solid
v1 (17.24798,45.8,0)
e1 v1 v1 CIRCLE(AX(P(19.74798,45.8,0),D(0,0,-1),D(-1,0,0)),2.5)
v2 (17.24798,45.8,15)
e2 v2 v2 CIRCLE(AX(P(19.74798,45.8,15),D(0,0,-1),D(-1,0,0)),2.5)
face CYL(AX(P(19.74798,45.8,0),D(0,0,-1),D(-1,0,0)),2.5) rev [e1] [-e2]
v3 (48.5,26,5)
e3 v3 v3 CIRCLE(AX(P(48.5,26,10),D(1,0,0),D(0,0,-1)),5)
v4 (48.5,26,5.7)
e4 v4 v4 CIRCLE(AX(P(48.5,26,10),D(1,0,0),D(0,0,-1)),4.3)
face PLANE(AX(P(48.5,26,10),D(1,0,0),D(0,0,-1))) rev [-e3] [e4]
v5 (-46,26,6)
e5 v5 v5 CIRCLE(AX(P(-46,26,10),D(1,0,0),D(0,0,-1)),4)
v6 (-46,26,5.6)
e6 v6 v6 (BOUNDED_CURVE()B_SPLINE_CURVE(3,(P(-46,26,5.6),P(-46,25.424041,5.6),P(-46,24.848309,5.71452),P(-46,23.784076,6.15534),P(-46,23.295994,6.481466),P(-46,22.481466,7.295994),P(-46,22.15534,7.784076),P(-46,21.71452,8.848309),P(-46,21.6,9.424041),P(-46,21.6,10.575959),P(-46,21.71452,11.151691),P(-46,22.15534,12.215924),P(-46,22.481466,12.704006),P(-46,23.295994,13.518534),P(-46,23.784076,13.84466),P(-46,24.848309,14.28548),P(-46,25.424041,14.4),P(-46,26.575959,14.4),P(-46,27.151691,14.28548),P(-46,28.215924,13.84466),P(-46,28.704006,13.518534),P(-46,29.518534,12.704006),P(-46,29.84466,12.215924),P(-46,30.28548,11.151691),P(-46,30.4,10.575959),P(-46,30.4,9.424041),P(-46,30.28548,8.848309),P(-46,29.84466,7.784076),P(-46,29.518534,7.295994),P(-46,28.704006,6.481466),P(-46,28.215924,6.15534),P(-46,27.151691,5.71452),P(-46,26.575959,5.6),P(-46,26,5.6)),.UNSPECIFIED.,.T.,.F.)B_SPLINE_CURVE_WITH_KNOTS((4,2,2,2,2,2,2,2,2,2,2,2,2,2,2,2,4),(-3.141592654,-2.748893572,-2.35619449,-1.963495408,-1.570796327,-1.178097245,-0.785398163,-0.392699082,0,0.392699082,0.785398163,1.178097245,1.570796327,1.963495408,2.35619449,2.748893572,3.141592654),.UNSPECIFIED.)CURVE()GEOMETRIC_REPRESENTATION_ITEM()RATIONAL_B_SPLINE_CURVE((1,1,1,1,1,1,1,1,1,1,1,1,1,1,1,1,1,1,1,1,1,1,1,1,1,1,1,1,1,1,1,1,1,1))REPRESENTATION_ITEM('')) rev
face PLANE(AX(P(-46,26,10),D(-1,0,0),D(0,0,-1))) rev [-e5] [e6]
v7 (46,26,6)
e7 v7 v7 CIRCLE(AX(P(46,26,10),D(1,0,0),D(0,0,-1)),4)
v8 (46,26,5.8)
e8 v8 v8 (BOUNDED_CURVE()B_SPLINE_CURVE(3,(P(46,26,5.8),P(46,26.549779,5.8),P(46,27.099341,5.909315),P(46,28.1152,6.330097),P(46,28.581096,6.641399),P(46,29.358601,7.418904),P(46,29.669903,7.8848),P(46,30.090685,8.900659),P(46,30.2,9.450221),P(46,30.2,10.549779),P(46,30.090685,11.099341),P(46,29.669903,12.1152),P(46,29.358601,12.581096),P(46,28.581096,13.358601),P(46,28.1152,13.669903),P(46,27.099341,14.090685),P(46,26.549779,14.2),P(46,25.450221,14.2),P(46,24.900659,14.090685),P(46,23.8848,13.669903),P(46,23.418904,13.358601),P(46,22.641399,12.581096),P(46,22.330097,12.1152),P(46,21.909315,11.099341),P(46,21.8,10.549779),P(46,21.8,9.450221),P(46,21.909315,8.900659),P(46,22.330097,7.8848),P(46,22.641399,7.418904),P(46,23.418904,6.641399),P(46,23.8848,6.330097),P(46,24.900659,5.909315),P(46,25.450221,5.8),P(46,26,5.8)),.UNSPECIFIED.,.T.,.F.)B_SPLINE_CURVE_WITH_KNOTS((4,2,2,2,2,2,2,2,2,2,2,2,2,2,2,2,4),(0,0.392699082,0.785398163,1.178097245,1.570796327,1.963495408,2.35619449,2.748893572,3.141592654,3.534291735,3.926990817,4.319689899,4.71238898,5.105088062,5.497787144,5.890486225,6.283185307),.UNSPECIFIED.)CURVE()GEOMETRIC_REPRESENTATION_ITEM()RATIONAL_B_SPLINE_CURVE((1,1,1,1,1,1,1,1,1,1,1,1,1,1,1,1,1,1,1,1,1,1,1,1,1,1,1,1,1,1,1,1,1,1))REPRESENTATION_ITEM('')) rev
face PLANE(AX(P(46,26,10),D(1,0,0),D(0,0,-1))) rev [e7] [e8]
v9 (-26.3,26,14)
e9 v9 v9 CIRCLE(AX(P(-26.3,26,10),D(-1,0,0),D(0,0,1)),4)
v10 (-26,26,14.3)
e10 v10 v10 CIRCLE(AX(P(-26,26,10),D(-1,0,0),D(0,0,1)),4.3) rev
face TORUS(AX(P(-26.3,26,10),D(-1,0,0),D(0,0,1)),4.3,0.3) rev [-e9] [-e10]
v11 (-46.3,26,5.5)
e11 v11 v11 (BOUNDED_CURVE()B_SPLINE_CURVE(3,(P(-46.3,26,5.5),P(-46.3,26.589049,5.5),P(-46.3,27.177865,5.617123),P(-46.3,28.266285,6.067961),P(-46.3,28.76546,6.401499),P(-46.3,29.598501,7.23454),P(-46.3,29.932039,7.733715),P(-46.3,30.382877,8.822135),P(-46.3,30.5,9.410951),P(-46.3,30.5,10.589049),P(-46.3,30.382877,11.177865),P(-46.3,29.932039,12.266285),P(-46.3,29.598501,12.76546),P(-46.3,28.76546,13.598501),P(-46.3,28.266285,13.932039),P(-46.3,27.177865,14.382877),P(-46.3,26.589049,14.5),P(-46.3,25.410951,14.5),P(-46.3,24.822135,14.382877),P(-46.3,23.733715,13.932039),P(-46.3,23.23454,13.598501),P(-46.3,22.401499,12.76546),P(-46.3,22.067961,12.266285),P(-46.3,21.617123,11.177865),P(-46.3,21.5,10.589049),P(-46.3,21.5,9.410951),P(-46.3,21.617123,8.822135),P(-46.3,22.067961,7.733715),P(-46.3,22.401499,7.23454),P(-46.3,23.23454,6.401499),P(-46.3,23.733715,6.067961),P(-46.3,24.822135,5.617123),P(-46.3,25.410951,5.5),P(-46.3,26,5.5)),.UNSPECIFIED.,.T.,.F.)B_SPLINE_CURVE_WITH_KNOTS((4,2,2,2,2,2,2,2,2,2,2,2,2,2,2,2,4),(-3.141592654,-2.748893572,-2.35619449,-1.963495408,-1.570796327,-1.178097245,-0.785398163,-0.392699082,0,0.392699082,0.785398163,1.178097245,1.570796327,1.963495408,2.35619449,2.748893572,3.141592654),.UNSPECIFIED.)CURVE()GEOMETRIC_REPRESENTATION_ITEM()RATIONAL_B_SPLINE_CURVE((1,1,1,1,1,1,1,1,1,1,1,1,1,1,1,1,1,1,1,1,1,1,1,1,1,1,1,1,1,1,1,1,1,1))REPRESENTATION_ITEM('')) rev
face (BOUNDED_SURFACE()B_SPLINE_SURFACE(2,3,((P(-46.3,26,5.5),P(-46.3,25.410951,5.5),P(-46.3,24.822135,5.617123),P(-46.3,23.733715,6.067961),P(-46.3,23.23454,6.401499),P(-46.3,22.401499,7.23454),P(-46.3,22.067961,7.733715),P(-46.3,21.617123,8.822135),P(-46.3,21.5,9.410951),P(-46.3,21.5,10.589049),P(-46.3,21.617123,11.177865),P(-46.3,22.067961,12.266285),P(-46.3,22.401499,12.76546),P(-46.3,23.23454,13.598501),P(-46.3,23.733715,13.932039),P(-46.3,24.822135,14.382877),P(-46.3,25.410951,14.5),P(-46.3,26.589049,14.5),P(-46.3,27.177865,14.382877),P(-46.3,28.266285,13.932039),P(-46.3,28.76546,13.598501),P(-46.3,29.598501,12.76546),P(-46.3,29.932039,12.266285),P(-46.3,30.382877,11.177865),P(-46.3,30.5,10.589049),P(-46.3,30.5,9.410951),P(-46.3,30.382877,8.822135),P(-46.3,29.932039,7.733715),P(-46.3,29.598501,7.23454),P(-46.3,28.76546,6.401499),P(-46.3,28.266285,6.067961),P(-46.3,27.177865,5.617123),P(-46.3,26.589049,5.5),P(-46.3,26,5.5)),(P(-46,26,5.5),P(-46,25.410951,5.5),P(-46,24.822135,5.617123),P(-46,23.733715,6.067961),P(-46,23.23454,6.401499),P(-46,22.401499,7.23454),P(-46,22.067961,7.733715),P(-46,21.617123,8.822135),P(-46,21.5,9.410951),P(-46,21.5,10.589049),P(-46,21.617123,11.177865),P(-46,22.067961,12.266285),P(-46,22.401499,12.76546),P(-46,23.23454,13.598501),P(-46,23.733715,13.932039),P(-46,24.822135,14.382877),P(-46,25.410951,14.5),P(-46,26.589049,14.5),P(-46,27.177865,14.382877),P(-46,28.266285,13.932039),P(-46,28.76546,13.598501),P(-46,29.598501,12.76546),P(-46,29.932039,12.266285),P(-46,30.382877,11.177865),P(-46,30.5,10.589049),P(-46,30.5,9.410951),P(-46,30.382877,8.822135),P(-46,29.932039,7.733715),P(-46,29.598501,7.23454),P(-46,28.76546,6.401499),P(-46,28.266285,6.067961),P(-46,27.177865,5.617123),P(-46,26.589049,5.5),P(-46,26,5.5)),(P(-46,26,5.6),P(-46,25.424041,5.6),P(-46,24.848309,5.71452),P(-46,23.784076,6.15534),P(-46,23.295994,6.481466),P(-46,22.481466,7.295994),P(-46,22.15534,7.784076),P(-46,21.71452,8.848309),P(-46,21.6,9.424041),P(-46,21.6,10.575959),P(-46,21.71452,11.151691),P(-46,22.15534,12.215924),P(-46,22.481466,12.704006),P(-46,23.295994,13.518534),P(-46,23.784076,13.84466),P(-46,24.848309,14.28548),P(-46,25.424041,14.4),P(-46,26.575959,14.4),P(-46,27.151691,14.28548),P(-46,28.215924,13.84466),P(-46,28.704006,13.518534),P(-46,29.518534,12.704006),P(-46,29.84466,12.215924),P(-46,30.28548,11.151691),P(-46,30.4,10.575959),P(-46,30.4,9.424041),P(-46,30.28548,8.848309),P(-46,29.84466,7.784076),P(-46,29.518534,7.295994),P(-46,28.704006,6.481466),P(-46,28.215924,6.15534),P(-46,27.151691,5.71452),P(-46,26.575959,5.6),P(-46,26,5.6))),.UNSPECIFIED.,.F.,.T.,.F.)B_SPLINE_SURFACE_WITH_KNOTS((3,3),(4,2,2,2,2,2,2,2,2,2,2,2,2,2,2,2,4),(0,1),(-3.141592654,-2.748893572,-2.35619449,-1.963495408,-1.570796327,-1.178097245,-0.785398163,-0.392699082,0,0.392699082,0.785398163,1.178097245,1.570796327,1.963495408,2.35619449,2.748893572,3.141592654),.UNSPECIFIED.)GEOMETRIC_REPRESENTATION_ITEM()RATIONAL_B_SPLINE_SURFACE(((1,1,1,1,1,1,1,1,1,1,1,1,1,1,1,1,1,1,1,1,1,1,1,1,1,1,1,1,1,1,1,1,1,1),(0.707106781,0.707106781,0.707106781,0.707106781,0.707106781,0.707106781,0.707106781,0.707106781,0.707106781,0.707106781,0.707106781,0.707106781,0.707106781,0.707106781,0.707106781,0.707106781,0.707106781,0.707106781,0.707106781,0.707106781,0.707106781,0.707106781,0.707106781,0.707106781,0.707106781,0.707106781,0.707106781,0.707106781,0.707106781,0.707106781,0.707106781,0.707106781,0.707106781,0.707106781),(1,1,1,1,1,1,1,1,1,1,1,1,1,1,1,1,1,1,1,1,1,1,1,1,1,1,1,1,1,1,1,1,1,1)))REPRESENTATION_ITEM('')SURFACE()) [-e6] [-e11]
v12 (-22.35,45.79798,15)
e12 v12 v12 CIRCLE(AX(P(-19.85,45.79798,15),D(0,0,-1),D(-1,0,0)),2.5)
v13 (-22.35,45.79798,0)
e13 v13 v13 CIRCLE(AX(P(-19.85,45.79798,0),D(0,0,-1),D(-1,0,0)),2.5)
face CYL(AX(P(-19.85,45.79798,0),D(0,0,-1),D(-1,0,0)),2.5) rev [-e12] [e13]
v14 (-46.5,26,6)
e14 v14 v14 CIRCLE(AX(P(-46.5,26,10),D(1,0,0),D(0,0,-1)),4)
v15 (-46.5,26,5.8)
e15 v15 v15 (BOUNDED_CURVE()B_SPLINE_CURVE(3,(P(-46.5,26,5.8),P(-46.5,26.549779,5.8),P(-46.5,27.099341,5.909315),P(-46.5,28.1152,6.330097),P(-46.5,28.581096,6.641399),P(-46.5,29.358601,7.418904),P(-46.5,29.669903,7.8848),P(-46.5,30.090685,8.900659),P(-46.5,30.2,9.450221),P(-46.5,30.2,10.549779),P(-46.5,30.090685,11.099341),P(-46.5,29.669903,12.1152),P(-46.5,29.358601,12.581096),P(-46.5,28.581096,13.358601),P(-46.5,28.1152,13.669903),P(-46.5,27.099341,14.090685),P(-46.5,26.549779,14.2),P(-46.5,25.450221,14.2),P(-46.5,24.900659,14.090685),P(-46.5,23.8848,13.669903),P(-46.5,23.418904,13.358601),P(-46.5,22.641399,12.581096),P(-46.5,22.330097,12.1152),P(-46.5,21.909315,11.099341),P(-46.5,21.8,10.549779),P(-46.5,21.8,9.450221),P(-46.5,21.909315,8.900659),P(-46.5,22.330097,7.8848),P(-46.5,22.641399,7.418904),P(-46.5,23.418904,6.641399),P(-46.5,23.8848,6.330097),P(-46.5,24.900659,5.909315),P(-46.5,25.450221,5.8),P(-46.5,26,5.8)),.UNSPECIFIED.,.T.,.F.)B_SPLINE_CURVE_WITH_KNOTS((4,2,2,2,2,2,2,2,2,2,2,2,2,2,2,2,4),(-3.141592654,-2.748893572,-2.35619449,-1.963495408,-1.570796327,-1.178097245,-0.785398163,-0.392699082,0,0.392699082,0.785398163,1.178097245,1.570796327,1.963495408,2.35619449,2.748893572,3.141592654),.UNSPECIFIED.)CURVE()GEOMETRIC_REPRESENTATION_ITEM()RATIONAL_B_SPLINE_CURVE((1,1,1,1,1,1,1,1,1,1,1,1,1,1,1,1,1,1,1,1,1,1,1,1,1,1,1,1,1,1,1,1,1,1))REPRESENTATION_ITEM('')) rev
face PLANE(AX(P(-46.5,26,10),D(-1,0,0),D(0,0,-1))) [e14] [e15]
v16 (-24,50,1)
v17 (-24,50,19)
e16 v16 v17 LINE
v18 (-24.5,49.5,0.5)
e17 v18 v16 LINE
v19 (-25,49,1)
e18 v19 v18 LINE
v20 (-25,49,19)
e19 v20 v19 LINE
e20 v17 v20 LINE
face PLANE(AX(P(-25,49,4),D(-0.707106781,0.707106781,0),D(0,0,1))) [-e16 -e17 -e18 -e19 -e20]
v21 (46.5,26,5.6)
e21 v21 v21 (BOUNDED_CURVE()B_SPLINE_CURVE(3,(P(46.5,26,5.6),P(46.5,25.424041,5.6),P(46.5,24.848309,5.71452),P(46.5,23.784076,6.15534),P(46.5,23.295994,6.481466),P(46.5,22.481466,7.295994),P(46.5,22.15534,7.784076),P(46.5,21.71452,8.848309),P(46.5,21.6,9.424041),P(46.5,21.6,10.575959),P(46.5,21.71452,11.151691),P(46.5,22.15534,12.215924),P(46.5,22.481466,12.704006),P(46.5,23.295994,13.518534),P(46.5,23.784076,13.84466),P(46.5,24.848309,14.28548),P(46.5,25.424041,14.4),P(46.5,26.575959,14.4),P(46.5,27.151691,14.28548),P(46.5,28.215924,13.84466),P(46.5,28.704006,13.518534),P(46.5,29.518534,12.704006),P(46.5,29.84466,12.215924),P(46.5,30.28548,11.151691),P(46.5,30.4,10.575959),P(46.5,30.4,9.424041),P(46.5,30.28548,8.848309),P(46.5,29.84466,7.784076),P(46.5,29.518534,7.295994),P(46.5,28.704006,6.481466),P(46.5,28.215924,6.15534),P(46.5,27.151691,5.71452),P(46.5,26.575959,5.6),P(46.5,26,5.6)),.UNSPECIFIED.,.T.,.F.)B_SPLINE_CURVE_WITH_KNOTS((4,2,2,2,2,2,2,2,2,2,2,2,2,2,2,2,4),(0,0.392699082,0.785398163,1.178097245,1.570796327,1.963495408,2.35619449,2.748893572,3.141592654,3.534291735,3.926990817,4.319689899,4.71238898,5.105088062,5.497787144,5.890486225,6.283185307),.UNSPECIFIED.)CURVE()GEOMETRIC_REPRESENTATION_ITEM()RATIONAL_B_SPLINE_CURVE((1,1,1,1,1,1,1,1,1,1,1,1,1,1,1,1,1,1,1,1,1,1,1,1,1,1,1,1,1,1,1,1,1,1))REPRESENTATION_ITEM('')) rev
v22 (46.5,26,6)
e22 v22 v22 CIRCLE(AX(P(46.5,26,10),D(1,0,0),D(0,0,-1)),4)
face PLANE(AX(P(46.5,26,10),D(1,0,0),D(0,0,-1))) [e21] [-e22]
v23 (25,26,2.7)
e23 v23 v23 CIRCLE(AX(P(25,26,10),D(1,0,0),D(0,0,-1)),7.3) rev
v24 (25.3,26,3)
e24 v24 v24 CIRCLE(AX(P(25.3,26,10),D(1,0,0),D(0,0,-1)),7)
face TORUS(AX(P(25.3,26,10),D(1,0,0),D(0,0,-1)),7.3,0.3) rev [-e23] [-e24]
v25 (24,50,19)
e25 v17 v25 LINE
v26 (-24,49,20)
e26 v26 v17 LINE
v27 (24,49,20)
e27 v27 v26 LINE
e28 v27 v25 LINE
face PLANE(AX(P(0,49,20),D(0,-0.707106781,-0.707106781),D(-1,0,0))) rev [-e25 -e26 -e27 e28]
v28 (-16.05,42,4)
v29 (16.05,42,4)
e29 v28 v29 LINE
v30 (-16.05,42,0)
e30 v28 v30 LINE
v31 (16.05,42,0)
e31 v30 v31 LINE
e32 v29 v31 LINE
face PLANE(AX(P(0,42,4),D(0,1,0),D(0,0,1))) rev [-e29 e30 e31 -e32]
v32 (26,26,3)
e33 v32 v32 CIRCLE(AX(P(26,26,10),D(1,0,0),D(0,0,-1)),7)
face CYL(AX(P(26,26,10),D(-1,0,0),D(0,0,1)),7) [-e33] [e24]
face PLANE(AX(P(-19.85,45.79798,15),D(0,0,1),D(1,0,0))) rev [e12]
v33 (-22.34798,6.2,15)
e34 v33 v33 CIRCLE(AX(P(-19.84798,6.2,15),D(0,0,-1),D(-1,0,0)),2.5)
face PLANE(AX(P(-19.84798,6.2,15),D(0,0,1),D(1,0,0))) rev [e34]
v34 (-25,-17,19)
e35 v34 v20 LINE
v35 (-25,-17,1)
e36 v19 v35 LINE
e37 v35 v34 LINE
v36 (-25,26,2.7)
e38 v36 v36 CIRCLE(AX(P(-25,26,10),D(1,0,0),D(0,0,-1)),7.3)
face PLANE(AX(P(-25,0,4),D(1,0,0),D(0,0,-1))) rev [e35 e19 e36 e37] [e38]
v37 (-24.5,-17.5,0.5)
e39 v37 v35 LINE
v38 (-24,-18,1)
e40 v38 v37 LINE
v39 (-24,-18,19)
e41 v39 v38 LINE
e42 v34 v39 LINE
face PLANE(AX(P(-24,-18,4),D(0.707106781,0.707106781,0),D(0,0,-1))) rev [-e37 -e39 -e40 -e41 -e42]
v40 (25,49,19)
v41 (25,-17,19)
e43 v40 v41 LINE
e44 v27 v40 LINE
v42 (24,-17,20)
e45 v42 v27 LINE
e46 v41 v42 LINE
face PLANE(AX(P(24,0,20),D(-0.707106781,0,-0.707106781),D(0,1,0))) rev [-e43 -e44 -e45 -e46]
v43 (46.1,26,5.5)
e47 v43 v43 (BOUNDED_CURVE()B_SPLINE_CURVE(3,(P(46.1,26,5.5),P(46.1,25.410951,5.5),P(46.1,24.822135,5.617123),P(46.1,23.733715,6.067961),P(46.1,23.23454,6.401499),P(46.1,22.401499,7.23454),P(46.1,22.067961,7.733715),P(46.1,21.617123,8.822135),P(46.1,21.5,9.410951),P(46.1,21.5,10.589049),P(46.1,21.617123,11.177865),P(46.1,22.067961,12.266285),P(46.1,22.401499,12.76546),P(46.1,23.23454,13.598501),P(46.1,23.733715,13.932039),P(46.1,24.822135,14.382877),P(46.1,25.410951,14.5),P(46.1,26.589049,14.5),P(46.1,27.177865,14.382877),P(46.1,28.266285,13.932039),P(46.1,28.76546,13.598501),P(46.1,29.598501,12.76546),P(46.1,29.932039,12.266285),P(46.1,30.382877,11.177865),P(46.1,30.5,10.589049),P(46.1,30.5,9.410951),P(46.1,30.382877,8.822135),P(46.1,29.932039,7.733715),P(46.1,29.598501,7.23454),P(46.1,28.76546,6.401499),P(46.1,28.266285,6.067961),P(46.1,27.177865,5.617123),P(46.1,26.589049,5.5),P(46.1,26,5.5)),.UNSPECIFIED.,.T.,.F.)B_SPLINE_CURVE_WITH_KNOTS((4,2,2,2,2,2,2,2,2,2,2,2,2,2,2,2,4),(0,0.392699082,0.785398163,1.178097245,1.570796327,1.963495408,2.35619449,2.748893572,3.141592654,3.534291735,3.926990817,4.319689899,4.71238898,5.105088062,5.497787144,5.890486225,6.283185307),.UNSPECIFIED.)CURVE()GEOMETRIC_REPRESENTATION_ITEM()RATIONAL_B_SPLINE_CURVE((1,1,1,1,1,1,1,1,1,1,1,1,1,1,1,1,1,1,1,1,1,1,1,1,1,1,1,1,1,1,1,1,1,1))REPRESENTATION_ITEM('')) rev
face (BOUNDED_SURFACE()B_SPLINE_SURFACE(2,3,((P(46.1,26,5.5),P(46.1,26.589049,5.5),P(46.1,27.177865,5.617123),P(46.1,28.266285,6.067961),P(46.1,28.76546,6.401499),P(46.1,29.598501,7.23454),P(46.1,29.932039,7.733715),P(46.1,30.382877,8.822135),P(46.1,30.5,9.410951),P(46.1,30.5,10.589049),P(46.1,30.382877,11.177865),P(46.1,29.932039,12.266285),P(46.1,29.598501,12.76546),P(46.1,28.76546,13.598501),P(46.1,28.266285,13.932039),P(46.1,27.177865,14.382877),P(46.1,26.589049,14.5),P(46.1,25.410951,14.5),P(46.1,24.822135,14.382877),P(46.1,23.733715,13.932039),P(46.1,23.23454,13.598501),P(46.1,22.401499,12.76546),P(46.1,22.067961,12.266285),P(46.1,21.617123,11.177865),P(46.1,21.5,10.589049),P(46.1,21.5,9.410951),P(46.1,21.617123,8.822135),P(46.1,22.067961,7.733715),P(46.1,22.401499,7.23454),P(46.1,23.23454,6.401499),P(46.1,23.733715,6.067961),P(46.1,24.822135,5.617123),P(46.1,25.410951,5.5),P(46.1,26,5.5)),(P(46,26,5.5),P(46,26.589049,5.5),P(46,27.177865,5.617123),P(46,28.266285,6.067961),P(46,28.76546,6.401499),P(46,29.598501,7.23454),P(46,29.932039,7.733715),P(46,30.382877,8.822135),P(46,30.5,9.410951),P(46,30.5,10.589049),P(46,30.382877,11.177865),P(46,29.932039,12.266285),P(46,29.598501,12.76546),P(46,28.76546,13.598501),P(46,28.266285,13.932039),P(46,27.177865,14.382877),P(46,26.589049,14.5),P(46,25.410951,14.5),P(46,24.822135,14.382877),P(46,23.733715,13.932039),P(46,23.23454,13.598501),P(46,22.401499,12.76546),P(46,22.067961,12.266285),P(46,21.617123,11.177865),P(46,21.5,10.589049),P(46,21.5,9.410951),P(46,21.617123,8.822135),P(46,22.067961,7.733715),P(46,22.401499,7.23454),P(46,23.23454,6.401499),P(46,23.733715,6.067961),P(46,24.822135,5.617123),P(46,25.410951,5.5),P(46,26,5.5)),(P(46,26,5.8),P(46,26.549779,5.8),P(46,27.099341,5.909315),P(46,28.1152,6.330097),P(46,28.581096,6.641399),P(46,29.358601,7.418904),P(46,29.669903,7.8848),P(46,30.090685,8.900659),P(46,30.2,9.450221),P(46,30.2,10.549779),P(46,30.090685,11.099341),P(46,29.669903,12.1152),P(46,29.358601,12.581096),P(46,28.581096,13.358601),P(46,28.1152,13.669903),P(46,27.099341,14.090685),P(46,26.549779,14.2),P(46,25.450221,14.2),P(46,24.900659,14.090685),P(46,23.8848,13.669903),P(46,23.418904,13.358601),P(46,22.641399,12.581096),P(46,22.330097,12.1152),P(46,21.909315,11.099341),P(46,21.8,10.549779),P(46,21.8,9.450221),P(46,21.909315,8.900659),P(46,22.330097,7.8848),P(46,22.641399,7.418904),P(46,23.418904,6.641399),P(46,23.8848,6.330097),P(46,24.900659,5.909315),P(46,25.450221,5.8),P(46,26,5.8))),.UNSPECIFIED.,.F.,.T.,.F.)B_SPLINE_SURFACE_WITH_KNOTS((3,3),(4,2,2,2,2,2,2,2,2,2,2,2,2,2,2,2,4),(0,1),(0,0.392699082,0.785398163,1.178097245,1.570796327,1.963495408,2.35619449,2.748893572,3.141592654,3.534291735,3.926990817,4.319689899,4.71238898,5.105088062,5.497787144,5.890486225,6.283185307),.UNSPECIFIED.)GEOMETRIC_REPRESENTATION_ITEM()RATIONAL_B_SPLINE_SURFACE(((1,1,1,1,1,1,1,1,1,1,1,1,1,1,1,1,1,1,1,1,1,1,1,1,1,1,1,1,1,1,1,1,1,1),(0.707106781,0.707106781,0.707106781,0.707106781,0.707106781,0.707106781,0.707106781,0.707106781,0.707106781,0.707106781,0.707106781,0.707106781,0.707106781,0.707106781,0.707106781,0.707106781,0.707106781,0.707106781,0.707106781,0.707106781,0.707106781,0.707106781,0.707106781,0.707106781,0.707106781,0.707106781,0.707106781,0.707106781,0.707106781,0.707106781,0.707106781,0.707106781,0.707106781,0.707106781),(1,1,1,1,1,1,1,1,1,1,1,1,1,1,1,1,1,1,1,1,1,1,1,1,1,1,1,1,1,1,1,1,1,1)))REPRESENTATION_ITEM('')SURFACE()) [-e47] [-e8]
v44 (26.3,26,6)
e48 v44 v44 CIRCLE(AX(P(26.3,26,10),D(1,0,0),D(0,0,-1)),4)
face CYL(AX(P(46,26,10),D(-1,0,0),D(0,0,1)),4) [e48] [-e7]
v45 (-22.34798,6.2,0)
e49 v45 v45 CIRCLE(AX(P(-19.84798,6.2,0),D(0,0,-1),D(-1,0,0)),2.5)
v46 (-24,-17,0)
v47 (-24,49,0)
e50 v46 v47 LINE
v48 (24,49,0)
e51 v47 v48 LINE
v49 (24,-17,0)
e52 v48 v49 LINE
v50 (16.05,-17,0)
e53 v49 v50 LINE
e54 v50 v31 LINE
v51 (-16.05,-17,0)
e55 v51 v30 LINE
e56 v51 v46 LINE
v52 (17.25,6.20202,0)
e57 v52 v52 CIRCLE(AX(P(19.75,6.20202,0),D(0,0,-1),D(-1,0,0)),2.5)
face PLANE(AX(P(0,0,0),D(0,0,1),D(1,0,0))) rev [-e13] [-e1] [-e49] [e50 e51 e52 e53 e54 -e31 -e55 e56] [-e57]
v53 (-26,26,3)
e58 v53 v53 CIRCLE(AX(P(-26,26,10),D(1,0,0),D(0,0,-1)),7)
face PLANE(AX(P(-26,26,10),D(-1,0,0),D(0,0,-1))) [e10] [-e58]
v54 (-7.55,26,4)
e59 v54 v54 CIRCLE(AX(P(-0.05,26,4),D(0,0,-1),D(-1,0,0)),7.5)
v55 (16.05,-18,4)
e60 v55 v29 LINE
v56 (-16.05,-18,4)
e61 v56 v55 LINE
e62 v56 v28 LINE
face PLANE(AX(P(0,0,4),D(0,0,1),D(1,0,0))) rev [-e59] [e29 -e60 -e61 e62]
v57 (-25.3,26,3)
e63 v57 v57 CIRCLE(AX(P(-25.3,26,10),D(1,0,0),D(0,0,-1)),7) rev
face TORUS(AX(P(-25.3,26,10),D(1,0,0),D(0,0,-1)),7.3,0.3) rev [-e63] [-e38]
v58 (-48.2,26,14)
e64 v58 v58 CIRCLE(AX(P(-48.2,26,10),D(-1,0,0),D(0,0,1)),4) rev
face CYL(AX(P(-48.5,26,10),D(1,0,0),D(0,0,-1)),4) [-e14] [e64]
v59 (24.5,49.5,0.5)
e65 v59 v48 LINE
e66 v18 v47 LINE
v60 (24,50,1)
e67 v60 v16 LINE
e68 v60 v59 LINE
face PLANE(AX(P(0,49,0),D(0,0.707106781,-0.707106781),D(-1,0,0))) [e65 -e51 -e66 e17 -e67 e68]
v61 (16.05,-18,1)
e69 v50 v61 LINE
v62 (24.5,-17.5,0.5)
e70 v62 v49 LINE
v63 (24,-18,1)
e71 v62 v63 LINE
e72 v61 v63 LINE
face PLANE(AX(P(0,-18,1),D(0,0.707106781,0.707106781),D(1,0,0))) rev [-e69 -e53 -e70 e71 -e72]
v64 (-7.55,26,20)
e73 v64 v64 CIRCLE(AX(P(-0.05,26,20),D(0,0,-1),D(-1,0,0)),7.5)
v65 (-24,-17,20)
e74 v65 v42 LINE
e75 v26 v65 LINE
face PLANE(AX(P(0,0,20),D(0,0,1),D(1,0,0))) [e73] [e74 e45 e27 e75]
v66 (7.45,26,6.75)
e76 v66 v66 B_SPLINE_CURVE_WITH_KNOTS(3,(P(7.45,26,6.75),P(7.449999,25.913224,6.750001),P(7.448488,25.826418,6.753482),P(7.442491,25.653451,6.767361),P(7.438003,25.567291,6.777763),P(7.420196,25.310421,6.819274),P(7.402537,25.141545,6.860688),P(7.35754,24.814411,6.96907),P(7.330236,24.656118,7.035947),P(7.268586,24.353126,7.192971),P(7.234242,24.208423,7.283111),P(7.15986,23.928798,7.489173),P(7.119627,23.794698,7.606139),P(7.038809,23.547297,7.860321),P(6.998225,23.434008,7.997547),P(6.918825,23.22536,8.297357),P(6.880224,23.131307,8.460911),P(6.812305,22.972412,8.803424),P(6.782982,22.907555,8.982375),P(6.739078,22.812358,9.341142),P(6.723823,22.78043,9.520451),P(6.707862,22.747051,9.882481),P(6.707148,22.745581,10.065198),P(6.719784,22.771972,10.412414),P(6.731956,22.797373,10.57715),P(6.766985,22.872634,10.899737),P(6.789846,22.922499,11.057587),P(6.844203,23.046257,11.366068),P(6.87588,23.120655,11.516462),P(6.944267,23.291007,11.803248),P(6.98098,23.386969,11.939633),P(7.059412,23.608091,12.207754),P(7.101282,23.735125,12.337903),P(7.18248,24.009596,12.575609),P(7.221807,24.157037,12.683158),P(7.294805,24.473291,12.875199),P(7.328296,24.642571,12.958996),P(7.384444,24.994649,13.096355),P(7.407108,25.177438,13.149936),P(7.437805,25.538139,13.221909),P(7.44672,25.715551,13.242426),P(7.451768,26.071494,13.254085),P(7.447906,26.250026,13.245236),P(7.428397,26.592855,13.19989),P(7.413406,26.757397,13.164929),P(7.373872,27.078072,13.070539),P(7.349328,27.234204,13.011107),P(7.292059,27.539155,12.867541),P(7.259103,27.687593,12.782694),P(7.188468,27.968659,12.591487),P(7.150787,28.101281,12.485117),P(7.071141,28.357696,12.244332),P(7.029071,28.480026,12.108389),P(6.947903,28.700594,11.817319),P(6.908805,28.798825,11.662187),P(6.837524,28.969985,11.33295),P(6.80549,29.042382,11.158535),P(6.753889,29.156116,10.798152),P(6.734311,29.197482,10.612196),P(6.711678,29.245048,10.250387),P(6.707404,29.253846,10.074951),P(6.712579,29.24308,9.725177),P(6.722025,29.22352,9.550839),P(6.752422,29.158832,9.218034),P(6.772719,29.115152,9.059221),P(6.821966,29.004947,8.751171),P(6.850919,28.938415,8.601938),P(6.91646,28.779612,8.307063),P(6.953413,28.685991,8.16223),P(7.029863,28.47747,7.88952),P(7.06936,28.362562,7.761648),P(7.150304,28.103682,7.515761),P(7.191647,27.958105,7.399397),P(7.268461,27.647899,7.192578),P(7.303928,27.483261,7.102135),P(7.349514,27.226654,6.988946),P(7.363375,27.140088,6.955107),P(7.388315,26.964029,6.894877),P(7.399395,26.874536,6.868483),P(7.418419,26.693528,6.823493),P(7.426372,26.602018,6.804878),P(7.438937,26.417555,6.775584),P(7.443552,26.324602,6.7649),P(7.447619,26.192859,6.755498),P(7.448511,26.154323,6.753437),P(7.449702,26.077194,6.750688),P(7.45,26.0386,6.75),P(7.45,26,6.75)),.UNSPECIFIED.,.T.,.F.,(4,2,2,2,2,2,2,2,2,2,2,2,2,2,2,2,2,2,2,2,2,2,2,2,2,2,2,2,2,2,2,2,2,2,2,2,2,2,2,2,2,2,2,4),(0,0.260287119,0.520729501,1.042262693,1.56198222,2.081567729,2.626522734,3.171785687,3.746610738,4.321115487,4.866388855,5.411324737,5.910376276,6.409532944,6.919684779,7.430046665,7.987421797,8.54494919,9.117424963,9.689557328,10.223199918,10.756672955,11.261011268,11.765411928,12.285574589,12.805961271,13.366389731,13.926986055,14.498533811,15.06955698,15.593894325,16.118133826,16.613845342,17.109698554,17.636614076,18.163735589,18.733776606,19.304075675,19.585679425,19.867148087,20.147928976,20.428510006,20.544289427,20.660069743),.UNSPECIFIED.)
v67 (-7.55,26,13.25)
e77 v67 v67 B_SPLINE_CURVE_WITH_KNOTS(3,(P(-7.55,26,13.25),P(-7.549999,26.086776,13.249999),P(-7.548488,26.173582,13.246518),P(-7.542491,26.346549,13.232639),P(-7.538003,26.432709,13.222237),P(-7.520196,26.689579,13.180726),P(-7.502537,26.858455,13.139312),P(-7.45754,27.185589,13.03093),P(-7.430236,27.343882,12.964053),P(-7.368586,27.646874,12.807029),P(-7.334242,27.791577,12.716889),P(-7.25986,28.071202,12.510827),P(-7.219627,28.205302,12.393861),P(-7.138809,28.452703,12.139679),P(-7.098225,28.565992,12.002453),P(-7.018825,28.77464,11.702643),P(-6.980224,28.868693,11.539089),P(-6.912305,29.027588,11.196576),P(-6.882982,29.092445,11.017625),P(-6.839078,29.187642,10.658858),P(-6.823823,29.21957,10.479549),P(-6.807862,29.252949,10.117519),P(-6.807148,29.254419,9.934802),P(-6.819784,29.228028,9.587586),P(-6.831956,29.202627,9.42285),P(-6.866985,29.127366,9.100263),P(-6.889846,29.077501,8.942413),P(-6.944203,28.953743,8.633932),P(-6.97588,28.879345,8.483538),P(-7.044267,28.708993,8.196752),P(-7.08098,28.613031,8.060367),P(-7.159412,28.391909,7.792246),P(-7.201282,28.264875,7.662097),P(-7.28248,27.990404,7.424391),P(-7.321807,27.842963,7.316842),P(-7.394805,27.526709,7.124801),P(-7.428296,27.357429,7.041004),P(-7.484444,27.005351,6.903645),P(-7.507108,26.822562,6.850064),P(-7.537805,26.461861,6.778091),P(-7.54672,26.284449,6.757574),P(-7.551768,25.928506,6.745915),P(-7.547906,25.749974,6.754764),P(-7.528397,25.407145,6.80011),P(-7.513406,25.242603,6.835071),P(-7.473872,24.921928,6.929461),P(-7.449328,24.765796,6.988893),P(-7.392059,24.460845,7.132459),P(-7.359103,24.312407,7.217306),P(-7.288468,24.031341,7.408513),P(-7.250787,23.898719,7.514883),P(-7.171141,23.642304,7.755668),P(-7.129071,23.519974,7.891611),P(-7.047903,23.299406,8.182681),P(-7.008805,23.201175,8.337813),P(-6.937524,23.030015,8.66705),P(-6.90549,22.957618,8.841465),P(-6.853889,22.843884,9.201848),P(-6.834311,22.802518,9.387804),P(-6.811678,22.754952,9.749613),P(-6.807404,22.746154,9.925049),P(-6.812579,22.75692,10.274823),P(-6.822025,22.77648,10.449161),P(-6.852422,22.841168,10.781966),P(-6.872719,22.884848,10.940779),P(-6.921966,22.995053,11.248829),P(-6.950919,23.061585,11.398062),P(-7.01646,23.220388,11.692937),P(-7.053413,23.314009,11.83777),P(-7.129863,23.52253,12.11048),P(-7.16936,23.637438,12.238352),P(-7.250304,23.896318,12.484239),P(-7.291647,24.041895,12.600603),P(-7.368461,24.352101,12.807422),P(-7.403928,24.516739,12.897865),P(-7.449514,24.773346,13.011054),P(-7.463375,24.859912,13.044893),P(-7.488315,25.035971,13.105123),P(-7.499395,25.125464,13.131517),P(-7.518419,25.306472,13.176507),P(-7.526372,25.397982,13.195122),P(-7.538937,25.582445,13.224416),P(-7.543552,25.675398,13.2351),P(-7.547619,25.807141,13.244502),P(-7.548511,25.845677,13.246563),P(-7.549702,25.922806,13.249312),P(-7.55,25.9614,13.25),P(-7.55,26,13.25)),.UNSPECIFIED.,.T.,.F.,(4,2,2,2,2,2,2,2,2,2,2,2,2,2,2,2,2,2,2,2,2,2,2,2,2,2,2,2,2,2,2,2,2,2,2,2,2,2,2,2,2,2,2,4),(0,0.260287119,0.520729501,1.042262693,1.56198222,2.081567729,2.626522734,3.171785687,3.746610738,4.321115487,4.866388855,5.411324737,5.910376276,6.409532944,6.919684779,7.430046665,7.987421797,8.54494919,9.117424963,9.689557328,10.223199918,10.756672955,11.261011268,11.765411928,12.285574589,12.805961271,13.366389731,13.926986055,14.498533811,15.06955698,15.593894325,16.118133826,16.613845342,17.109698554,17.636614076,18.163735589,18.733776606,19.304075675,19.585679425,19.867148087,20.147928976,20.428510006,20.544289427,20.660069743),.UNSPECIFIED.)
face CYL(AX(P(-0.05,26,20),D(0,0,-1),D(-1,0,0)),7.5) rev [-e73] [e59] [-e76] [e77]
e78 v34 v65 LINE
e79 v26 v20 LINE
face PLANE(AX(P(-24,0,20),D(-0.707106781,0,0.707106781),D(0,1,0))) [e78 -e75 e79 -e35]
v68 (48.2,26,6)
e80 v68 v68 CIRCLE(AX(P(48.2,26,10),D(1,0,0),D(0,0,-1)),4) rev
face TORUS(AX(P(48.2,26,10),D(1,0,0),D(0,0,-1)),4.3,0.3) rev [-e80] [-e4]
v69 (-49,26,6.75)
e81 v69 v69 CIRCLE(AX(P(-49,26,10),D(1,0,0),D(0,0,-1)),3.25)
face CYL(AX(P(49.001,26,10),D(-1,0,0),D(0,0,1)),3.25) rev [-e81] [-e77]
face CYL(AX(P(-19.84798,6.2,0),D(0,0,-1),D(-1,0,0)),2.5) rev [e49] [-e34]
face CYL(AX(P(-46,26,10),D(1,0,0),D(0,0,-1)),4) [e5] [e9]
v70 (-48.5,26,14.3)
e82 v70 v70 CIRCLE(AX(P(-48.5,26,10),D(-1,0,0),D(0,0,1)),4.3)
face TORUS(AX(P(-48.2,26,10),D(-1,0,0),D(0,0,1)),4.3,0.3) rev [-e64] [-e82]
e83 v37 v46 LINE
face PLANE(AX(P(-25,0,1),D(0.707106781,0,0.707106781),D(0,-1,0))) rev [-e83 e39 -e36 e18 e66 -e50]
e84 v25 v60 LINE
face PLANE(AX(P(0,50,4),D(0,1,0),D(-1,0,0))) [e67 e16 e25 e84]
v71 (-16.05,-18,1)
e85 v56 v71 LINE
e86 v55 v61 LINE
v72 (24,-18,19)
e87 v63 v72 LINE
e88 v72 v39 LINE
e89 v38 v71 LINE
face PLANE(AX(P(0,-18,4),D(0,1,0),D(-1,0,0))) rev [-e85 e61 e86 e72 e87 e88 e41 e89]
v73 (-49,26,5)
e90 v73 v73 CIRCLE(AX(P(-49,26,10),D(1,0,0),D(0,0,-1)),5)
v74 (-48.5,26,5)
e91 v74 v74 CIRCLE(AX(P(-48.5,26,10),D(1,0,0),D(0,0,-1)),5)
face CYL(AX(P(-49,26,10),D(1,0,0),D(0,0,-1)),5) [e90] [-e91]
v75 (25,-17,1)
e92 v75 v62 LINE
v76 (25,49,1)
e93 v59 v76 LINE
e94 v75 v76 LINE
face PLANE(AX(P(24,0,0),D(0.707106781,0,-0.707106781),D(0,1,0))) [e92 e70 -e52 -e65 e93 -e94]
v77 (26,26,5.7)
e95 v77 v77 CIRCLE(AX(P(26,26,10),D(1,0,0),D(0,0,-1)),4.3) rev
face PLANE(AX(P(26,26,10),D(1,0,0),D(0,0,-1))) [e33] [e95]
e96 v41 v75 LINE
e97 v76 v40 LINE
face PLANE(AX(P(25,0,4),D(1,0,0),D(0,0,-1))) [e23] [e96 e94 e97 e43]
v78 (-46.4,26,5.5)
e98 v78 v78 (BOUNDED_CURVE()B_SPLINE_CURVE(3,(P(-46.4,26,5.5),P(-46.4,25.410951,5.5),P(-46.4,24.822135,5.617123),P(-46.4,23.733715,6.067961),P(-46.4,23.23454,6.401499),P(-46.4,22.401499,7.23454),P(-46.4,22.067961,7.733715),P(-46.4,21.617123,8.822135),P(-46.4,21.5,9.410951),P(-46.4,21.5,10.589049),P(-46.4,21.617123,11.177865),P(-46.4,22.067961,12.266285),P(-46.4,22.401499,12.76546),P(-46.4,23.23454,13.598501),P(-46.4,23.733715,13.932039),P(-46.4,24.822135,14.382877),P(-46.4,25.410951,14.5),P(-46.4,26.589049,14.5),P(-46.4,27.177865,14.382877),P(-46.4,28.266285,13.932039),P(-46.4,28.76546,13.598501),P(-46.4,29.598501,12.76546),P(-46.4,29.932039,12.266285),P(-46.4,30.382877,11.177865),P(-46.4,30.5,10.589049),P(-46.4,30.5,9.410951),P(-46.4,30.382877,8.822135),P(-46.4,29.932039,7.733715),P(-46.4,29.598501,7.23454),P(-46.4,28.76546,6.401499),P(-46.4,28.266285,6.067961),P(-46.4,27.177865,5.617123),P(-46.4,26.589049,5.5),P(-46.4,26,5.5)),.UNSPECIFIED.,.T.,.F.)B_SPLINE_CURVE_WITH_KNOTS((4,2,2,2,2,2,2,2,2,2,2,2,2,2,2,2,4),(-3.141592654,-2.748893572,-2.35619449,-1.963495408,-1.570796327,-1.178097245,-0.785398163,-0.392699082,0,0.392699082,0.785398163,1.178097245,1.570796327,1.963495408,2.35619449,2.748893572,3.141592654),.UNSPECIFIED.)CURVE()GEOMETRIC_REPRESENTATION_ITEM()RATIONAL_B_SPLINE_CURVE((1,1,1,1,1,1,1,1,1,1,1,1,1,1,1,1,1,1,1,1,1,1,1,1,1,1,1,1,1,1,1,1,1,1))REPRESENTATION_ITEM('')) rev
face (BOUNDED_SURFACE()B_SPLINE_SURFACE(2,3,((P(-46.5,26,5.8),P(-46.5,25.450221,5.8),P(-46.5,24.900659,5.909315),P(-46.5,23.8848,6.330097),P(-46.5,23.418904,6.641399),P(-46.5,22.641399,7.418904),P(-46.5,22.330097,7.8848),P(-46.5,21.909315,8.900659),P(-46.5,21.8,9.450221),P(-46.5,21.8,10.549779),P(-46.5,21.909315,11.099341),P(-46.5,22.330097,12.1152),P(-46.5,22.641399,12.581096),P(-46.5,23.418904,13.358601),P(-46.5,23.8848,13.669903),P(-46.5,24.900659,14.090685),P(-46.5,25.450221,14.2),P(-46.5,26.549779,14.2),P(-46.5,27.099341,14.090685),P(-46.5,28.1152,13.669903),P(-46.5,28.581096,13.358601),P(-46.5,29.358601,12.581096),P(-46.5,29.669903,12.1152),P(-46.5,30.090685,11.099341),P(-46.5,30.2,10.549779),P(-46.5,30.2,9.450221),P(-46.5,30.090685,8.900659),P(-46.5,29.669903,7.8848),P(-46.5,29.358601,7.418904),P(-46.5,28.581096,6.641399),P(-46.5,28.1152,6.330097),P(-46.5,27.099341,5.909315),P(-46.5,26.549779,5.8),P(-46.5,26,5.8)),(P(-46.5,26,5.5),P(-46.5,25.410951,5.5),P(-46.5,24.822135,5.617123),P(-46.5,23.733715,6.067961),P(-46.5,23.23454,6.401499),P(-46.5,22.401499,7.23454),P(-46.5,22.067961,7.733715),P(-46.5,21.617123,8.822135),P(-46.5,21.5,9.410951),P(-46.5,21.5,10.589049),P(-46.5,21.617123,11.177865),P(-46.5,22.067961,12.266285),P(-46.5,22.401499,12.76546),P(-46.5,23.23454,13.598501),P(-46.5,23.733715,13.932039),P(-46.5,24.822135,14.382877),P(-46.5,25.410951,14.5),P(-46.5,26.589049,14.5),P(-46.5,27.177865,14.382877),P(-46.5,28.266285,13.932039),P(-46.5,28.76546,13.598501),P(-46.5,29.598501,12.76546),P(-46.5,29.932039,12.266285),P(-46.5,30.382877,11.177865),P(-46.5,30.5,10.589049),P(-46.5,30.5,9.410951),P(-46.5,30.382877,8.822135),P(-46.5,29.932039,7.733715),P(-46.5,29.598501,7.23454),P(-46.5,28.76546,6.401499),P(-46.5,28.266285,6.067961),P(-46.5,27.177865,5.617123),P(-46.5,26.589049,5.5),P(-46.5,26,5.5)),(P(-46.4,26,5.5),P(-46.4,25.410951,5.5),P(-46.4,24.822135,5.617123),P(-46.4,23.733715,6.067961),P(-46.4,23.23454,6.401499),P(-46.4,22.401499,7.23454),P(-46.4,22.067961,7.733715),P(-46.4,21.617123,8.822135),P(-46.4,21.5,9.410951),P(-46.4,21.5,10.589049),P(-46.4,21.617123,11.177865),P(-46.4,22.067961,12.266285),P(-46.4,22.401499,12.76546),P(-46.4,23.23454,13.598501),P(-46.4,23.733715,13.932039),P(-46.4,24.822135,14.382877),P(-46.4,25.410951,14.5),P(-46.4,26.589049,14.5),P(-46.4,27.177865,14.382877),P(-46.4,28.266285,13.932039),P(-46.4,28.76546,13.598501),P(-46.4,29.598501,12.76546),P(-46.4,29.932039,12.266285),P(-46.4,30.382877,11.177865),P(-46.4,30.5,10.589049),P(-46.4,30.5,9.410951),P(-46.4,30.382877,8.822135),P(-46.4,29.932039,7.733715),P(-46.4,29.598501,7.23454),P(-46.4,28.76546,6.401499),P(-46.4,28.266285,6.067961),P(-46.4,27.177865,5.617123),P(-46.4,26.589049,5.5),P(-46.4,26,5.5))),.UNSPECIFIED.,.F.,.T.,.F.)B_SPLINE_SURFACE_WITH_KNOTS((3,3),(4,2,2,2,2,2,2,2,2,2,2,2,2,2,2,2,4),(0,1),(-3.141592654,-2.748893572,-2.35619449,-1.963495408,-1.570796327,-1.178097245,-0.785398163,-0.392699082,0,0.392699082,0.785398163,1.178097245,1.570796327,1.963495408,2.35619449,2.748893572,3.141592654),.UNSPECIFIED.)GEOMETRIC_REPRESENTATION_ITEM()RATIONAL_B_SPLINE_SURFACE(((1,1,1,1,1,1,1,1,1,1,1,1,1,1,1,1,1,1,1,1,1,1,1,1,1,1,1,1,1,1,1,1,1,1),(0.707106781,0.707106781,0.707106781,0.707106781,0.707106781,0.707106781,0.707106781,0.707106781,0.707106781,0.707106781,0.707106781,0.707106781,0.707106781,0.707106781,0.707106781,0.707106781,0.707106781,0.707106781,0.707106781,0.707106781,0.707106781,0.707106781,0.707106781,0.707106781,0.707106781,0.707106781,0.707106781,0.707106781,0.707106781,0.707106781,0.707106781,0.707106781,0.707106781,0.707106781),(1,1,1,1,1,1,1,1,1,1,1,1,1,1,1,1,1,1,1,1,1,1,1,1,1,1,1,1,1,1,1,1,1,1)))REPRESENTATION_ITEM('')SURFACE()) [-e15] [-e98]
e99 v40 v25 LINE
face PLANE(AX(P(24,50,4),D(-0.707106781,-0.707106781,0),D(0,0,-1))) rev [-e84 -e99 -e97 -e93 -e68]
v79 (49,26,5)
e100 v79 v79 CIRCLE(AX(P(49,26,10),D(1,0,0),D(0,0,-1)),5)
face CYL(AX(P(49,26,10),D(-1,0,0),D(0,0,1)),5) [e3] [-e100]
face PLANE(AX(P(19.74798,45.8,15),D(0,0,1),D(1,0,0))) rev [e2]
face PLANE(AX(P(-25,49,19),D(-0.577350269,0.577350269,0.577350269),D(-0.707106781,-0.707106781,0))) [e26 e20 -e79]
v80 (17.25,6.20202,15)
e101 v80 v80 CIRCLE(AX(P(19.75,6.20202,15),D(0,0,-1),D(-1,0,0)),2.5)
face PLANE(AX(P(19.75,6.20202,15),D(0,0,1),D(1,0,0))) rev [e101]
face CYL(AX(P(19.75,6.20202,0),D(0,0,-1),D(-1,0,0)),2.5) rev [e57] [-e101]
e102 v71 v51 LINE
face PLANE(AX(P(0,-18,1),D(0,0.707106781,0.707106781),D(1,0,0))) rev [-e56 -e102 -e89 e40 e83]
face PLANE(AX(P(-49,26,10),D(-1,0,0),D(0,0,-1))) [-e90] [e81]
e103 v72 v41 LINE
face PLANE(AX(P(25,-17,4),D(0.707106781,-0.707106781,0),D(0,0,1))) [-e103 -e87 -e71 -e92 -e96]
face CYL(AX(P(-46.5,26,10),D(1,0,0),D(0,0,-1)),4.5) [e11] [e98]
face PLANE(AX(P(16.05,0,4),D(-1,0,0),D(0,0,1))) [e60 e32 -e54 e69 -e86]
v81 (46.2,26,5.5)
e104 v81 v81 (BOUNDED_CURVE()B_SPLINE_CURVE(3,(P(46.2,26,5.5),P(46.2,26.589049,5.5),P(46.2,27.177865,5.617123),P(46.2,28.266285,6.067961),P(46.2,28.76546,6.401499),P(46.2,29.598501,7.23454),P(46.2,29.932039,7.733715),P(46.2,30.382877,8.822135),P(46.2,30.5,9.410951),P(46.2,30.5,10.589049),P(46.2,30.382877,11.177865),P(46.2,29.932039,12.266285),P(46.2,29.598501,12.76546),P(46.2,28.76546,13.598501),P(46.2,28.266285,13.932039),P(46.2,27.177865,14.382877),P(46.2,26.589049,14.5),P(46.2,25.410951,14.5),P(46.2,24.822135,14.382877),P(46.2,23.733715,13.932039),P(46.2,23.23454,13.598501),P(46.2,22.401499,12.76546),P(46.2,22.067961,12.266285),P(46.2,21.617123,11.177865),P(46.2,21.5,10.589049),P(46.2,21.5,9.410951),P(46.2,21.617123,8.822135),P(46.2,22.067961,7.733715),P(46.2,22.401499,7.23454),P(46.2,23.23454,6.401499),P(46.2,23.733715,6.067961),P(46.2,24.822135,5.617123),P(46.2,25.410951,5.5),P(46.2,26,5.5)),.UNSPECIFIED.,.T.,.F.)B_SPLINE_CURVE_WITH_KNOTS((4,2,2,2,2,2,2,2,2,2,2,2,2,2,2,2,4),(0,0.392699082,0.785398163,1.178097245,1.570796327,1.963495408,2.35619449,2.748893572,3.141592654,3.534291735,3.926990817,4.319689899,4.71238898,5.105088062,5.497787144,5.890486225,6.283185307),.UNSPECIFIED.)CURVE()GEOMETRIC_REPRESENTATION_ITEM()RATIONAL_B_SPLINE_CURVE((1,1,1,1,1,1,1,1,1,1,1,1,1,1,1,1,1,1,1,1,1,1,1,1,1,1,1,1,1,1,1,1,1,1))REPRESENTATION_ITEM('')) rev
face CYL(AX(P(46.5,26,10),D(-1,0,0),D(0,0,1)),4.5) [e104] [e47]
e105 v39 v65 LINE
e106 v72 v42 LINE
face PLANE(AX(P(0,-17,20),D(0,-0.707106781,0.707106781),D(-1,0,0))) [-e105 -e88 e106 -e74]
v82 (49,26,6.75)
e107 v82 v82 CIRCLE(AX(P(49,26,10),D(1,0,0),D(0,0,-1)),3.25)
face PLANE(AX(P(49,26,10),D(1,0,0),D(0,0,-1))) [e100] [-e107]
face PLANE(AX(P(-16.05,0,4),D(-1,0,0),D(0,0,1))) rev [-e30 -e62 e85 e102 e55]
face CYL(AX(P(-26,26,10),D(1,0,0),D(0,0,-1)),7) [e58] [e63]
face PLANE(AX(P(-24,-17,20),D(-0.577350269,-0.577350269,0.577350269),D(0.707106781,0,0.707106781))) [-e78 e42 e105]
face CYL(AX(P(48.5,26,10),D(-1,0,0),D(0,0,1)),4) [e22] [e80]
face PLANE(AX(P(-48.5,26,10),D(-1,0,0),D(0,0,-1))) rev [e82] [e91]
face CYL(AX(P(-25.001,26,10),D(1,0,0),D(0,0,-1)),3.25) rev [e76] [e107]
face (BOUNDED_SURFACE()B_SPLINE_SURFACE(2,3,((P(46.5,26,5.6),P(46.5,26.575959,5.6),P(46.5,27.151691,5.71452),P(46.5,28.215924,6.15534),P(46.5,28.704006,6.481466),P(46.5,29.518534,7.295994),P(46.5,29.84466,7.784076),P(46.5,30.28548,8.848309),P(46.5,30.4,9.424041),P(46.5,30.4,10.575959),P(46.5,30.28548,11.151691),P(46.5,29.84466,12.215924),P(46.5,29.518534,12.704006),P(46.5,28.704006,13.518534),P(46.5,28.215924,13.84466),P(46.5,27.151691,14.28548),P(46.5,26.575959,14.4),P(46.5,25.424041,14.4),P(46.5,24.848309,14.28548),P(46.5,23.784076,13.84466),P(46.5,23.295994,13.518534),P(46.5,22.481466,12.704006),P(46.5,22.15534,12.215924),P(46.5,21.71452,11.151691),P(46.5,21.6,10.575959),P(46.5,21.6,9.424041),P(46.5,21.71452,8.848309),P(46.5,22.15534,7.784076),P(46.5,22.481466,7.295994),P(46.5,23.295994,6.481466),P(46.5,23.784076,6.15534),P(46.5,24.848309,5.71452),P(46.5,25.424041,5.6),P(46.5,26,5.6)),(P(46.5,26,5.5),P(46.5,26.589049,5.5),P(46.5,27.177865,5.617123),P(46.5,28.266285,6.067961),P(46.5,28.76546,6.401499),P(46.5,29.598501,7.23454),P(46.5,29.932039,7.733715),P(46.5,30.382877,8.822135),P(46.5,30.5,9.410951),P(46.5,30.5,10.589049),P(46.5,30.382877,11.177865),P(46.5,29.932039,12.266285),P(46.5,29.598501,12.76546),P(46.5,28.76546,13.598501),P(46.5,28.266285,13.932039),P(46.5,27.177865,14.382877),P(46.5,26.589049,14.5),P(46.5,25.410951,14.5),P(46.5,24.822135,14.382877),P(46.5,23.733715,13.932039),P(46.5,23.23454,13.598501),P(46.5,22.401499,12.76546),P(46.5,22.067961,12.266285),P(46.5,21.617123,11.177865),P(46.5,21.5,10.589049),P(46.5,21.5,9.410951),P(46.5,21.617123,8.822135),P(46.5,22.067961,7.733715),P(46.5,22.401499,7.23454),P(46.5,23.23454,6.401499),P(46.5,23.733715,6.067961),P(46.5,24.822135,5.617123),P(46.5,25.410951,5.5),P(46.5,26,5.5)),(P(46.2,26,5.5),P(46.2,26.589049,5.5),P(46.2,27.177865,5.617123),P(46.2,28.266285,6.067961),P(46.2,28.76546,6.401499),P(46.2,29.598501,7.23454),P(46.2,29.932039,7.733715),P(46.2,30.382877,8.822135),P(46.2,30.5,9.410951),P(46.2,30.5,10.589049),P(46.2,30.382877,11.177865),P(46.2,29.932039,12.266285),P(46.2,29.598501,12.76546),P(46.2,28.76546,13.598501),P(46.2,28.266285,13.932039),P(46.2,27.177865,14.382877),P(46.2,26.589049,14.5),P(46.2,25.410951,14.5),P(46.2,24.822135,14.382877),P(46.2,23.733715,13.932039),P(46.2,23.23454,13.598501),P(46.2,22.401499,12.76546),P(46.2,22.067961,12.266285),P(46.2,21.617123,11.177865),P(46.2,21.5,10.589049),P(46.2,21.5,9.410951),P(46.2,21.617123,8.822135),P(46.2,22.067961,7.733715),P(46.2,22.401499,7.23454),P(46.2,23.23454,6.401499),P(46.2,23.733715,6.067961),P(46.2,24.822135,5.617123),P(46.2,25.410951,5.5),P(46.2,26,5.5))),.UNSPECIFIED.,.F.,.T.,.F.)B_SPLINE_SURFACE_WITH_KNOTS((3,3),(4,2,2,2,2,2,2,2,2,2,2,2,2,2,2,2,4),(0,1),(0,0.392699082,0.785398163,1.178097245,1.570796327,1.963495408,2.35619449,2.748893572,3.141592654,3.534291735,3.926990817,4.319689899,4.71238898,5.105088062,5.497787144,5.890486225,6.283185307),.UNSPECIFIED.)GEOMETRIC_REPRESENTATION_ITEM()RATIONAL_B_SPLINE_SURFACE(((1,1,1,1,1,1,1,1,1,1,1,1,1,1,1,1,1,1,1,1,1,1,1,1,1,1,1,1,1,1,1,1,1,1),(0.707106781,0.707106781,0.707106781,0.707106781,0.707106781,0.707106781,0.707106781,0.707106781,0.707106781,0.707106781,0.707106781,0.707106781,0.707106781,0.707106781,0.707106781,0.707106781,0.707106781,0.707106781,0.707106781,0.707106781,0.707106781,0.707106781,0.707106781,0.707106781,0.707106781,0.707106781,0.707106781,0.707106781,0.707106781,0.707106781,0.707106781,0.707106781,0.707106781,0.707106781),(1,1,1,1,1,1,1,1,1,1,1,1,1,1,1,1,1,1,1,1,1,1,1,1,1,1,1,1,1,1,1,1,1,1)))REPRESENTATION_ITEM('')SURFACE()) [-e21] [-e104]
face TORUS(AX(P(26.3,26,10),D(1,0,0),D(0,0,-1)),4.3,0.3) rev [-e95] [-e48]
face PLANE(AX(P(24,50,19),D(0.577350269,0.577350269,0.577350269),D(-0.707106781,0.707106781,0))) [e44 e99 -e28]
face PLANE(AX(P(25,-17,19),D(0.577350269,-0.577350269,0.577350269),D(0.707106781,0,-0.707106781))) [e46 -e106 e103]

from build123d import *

# Parameters (mm, degrees)
ESTRUSIONE_ESTRUSIONE1_DEPTH  = 4
SCHIZZO2_W                    = 50
SCHIZZO2_H                    = 68
ESTRUSIONE_ESTRUSIONE2_DEPTH  = 16
SCHIZZO3_R                    = 7.5
TAGLIO_ESTRUSIONE1_DEPTH      = 16
SCHIZZO4_R                    = 7
ESTRUSIONE_ESTRUSIONE3_DEPTH  = 1
SCHIZZO5_R                    = 4
ESTRUSIONE_ESTRUSIONE4_DEPTH  = 20
SCHIZZO6_R                    = 4.5
ESTRUSIONE_ESTRUSIONE5_DEPTH  = 0.5
SCHIZZO7_R                    = 4
ESTRUSIONE_ESTRUSIONE6_DEPTH  = 2
SCHIZZO8_R                    = 5
ESTRUSIONE_ESTRUSIONE7_DEPTH  = 0.5
RACCORDO1_R                   = 0.3
RACCORDO2_R                   = 0.3
RACCORDO3_R                   = 0.3
RACCORDO6_SIZE                = 0.1
RACCORDO6_SIZE_2              = 0.3
RACCORDO7_SIZE                = 0.1
RACCORDO7_SIZE_2              = 0.3
TAGLIO_ESTRUSIONE3_REACH      = 93.52
TAGLIO_ESTRUSIONE3_END_RADIUS = 7.5
SCHIZZO9_R                    = 3.25
RACCORDO8_SIZE                = 0.3
RACCORDO8_SIZE_2              = 0.1
RACCORDO9_SIZE                = 0.3
RACCORDO9_SIZE_2              = 0.1
RACCORDO12_R                  = 0.3
RACCORDO13_R                  = 0.3
SMUSSO1_SIZE                  = 1
SMUSSO2_SIZE                  = 1
FORO_PER_VITE_M1_1_D          = 5
FORO_PER_VITE_M1_1_DEPTH      = 15
RIPETIZIONECIRCOLARE4_COUNT   = 4


with BuildPart() as part:
    # Schizzo1 → Estrusione-Estrusione1 (new body)
    with BuildSketch(Plane.XY):
        Polygon((25, 50), (-25, 50), (-25, -18), (-16.05, -18), (-16.05, 42), (16.05, 42), (16.05, -18), (25, -18), align=None)
    extrude(amount=ESTRUSIONE_ESTRUSIONE1_DEPTH)

    # Schizzo2 → Estrusione-Estrusione2 (add)
    with BuildSketch(Plane.XY.offset(4)):
        with Locations((0, 16)):
            Rectangle(SCHIZZO2_W, SCHIZZO2_H)
    extrude(amount=ESTRUSIONE_ESTRUSIONE2_DEPTH)

    # Schizzo3 → Taglio-Estrusione1 (cut)
    with BuildSketch(Plane(origin=(0, 0, 4), x_dir=(-1, 0, 0), z_dir=(0, 0, -1))):
        with Locations((0.05, 26)):
            Circle(SCHIZZO3_R)
    extrude(amount=-TAGLIO_ESTRUSIONE1_DEPTH, mode=Mode.SUBTRACT)

    # Schizzo4 → Estrusione-Estrusione3 (add)
    with BuildSketch(Plane(origin=(25, 0, 0), x_dir=(0, 0, -1), z_dir=(1, 0, 0))):
        with Locations((-10, 26)):
            Circle(SCHIZZO4_R)
    estrusione_estrusione3 = extrude(amount=ESTRUSIONE_ESTRUSIONE3_DEPTH)

    # Schizzo5 → Estrusione-Estrusione4 (add)
    with BuildSketch(Plane(origin=(26, 0, 0), x_dir=(0, 0, -1), z_dir=(1, 0, 0))):
        with Locations((-10, 26)):
            Circle(SCHIZZO5_R)
    estrusione_estrusione4 = extrude(amount=ESTRUSIONE_ESTRUSIONE4_DEPTH)

    # Schizzo6 → Estrusione-Estrusione5 (add)
    with BuildSketch(Plane(origin=(46, 0, 0), x_dir=(0, 0, -1), z_dir=(1, 0, 0))):
        with Locations((-10, 26)):
            Circle(SCHIZZO6_R)
    estrusione_estrusione5 = extrude(amount=ESTRUSIONE_ESTRUSIONE5_DEPTH)

    # Schizzo7 → Estrusione-Estrusione6 (add)
    with BuildSketch(Plane(origin=(46.5, 0, 0), x_dir=(0, 0, -1), z_dir=(1, 0, 0))):
        with Locations((-10, 26)):
            Circle(SCHIZZO7_R)
    estrusione_estrusione6 = extrude(amount=ESTRUSIONE_ESTRUSIONE6_DEPTH)

    # Schizzo8 → Estrusione-Estrusione7 (add)
    with BuildSketch(Plane(origin=(48.5, 0, 0), x_dir=(0, 0, -1), z_dir=(1, 0, 0))):
        with Locations((-10, 26)):
            Circle(SCHIZZO8_R)
    estrusione_estrusione7 = extrude(amount=ESTRUSIONE_ESTRUSIONE7_DEPTH)

    # Raccordo1
    raccordo1_edges = [part.edges().sort_by_distance(p)[0] for p in [
        (25, 26, 17),
    ]]
    fillet(raccordo1_edges, radius=RACCORDO1_R)

    # Raccordo2
    raccordo2_edges = [part.edges().sort_by_distance(p)[0] for p in [
        (26, 26, 14),
    ]]
    fillet(raccordo2_edges, radius=RACCORDO2_R)

    # Raccordo3
    raccordo3_edges = [part.edges().sort_by_distance(p)[0] for p in [
        (48.5, 26, 14),
    ]]
    fillet(raccordo3_edges, radius=RACCORDO3_R)

    # Raccordo6
    # an asymmetric fillet: 0.3, 0.1 mm, written as the material it takes off along each edge
    with BuildSketch(Plane(origin=(46, 26, 10), x_dir=(0, 0, -1), z_dir=(0, -1, 0))) as raccordo6_piece_1:
        with BuildLine():
            Bezier((4.5, RACCORDO6_SIZE), (4.5, 0), (4.5 - RACCORDO6_SIZE_2, 0), weights=[1, 0.707106781, 1])
            Line((4.5 - RACCORDO6_SIZE_2, 0), (4.5, 0))
            Line((4.5, 0), (4.5, RACCORDO6_SIZE))
        make_face()
    revolve(axis=Axis((46, 26, 10), (1, 0, 0)), mode=Mode.SUBTRACT)

    # Raccordo7
    # an asymmetric fillet: 0.3, 0.1 mm, written as the material it takes off along each edge
    with BuildSketch(Plane(origin=(46.5, 26, 10), x_dir=(0, 0, -1), z_dir=(0, -1, 0))) as raccordo7_piece_1:
        with BuildLine():
            Bezier((4.5 - RACCORDO7_SIZE, 0), (4.5, 0), (4.5, -RACCORDO7_SIZE_2), weights=[1, 0.707106781, 1])
            Line((4.5, -RACCORDO7_SIZE_2), (4.5, 0))
            Line((4.5, 0), (4.5 - RACCORDO7_SIZE, 0))
        make_face()
    revolve(axis=Axis((46.5, 26, 10), (1, 0, 0)), mode=Mode.SUBTRACT)

    # Taglio-Estrusione3: up to this cylinder (the profile starts outside it)
    taglio_estrusione3_end = Plane(origin=(-0.05, 26, 10), z_dir=(0, 0, -1)) * Cylinder(TAGLIO_ESTRUSIONE3_END_RADIUS, 203.04, mode=Mode.PRIVATE)
    # Schizzo9 → Taglio-Estrusione3 (cut, up to the surface)
    with BuildSketch(Plane(origin=(49, 0, 0), x_dir=(0, 0, -1), z_dir=(1, 0, 0)), mode=Mode.PRIVATE) as taglio_estrusione3_sk1:
        with Locations((-10, 26)):
            Circle(SCHIZZO9_R)
    taglio_estrusione3_tool1 = extrude(taglio_estrusione3_sk1.sketch, amount=-TAGLIO_ESTRUSIONE3_REACH, mode=Mode.PRIVATE) - taglio_estrusione3_end
    taglio_estrusione3 = taglio_estrusione3_tool1.solids().sort_by_distance((49, 26, 10))[0]
    add(taglio_estrusione3, mode=Mode.SUBTRACT)

    # Specchia4: Estrusione-Estrusione3, Estrusione-Estrusione4, Estrusione-Estrusione5, Estrusione-Estrusione6, Estrusione-Estrusione7 across plane
    add(estrusione_estrusione3.mirror(Plane(origin=(0, 0, 0), x_dir=(0, 0, 1), z_dir=(1, 0, 0))))
    add(estrusione_estrusione4.mirror(Plane(origin=(0, 0, 0), x_dir=(0, 0, 1), z_dir=(1, 0, 0))))
    add(estrusione_estrusione5.mirror(Plane(origin=(0, 0, 0), x_dir=(0, 0, 1), z_dir=(1, 0, 0))))
    add(estrusione_estrusione6.mirror(Plane(origin=(0, 0, 0), x_dir=(0, 0, 1), z_dir=(1, 0, 0))))
    add(estrusione_estrusione7.mirror(Plane(origin=(0, 0, 0), x_dir=(0, 0, 1), z_dir=(1, 0, 0))))

    # Raccordo8
    # an asymmetric fillet: 0.3, 0.1 mm, written as the material it takes off along each edge
    with BuildSketch(Plane(origin=(-46, 26, 10), x_dir=(0, 0, -1), z_dir=(0, -1, 0))) as raccordo8_piece_1:
        with BuildLine():
            Bezier((4.5, -RACCORDO8_SIZE), (4.5, 0), (4.5 - RACCORDO8_SIZE_2, 0), weights=[1, 0.707106781, 1])
            Line((4.5 - RACCORDO8_SIZE_2, 0), (4.5, 0))
            Line((4.5, 0), (4.5, -RACCORDO8_SIZE))
        make_face()
    revolve(axis=Axis((-46, 26, 10), (1, 0, 0)), mode=Mode.SUBTRACT)

    # Raccordo9
    # an asymmetric fillet: 0.3, 0.1 mm, written as the material it takes off along each edge
    with BuildSketch(Plane(origin=(-46.5, 26, 10), x_dir=(0, 0, -1), z_dir=(0, -1, 0))) as raccordo9_piece_1:
        with BuildLine():
            Bezier((4.5 - RACCORDO9_SIZE, 0), (4.5, 0), (4.5, RACCORDO9_SIZE_2), weights=[1, 0.707106781, 1])
            Line((4.5, RACCORDO9_SIZE_2), (4.5, 0))
            Line((4.5, 0), (4.5 - RACCORDO9_SIZE, 0))
        make_face()
    revolve(axis=Axis((-46.5, 26, 10), (1, 0, 0)), mode=Mode.SUBTRACT)

    # Raccordo12
    raccordo12_edges = [part.edges().sort_by_distance(p)[0] for p in [
        (-25, 26, 17),
        (-26, 26, 14),
    ]]
    fillet(raccordo12_edges, radius=RACCORDO12_R)

    # Raccordo13
    raccordo13_edges = [part.edges().sort_by_distance(p)[0] for p in [
        (-48.5, 26, 14),
    ]]
    fillet(raccordo13_edges, radius=RACCORDO13_R)

    # Specchia9: Taglio-Estrusione3 across plane
    add(taglio_estrusione3.mirror(Plane(origin=(0, 0, 0), x_dir=(0, 0, 1), z_dir=(1, 0, 0))), mode=Mode.SUBTRACT)

    # Smusso1
    smusso1_edges = [part.edges().sort_by_distance(p)[0] for p in [
        (-20.525, -18, 0),
        (-25, 16, 0),
        (0, 50, 0),
        (25, 16, 0),
        (20.525, -18, 0),
    ]]
    chamfer(smusso1_edges, length=SMUSSO1_SIZE)

    # Smusso2
    smusso2_edges = [part.edges().sort_by_distance(p)[0] for p in [
        (-25, -18, 10.5),
        (-25, 50, 10.5),
        (25, 50, 10.5),
        (25, -18, 10.5),
        (-25, 16, 20),
        (0, -18, 20),
        (25, 16, 20),
        (0, 50, 20),
    ]]
    chamfer(smusso2_edges, length=SMUSSO2_SIZE)

    # Foro per Vite M1-1
    with Locations(Plane(origin=(0, 0, 0), x_dir=(-1, 0, 0), z_dir=(0, 0, -1))):
        with Locations((-19.747979695, 45.8)):
            foro_per_vite_m1_1 = Hole(FORO_PER_VITE_M1_1_D / 2, depth=FORO_PER_VITE_M1_1_DEPTH)

    # RipetizioneCircolare4: Foro per Vite M1-1 ×4 about axis
    ripetizionecircolare4_axis = Axis((-0.05, 26, 0), (0, 0, 1))
    for i in range(1, RIPETIZIONECIRCOLARE4_COUNT):
        add(foro_per_vite_m1_1.rotate(ripetizionecircolare4_axis, i * 360 / RIPETIZIONECIRCOLARE4_COUNT), mode=Mode.SUBTRACT)


solid = part.part
